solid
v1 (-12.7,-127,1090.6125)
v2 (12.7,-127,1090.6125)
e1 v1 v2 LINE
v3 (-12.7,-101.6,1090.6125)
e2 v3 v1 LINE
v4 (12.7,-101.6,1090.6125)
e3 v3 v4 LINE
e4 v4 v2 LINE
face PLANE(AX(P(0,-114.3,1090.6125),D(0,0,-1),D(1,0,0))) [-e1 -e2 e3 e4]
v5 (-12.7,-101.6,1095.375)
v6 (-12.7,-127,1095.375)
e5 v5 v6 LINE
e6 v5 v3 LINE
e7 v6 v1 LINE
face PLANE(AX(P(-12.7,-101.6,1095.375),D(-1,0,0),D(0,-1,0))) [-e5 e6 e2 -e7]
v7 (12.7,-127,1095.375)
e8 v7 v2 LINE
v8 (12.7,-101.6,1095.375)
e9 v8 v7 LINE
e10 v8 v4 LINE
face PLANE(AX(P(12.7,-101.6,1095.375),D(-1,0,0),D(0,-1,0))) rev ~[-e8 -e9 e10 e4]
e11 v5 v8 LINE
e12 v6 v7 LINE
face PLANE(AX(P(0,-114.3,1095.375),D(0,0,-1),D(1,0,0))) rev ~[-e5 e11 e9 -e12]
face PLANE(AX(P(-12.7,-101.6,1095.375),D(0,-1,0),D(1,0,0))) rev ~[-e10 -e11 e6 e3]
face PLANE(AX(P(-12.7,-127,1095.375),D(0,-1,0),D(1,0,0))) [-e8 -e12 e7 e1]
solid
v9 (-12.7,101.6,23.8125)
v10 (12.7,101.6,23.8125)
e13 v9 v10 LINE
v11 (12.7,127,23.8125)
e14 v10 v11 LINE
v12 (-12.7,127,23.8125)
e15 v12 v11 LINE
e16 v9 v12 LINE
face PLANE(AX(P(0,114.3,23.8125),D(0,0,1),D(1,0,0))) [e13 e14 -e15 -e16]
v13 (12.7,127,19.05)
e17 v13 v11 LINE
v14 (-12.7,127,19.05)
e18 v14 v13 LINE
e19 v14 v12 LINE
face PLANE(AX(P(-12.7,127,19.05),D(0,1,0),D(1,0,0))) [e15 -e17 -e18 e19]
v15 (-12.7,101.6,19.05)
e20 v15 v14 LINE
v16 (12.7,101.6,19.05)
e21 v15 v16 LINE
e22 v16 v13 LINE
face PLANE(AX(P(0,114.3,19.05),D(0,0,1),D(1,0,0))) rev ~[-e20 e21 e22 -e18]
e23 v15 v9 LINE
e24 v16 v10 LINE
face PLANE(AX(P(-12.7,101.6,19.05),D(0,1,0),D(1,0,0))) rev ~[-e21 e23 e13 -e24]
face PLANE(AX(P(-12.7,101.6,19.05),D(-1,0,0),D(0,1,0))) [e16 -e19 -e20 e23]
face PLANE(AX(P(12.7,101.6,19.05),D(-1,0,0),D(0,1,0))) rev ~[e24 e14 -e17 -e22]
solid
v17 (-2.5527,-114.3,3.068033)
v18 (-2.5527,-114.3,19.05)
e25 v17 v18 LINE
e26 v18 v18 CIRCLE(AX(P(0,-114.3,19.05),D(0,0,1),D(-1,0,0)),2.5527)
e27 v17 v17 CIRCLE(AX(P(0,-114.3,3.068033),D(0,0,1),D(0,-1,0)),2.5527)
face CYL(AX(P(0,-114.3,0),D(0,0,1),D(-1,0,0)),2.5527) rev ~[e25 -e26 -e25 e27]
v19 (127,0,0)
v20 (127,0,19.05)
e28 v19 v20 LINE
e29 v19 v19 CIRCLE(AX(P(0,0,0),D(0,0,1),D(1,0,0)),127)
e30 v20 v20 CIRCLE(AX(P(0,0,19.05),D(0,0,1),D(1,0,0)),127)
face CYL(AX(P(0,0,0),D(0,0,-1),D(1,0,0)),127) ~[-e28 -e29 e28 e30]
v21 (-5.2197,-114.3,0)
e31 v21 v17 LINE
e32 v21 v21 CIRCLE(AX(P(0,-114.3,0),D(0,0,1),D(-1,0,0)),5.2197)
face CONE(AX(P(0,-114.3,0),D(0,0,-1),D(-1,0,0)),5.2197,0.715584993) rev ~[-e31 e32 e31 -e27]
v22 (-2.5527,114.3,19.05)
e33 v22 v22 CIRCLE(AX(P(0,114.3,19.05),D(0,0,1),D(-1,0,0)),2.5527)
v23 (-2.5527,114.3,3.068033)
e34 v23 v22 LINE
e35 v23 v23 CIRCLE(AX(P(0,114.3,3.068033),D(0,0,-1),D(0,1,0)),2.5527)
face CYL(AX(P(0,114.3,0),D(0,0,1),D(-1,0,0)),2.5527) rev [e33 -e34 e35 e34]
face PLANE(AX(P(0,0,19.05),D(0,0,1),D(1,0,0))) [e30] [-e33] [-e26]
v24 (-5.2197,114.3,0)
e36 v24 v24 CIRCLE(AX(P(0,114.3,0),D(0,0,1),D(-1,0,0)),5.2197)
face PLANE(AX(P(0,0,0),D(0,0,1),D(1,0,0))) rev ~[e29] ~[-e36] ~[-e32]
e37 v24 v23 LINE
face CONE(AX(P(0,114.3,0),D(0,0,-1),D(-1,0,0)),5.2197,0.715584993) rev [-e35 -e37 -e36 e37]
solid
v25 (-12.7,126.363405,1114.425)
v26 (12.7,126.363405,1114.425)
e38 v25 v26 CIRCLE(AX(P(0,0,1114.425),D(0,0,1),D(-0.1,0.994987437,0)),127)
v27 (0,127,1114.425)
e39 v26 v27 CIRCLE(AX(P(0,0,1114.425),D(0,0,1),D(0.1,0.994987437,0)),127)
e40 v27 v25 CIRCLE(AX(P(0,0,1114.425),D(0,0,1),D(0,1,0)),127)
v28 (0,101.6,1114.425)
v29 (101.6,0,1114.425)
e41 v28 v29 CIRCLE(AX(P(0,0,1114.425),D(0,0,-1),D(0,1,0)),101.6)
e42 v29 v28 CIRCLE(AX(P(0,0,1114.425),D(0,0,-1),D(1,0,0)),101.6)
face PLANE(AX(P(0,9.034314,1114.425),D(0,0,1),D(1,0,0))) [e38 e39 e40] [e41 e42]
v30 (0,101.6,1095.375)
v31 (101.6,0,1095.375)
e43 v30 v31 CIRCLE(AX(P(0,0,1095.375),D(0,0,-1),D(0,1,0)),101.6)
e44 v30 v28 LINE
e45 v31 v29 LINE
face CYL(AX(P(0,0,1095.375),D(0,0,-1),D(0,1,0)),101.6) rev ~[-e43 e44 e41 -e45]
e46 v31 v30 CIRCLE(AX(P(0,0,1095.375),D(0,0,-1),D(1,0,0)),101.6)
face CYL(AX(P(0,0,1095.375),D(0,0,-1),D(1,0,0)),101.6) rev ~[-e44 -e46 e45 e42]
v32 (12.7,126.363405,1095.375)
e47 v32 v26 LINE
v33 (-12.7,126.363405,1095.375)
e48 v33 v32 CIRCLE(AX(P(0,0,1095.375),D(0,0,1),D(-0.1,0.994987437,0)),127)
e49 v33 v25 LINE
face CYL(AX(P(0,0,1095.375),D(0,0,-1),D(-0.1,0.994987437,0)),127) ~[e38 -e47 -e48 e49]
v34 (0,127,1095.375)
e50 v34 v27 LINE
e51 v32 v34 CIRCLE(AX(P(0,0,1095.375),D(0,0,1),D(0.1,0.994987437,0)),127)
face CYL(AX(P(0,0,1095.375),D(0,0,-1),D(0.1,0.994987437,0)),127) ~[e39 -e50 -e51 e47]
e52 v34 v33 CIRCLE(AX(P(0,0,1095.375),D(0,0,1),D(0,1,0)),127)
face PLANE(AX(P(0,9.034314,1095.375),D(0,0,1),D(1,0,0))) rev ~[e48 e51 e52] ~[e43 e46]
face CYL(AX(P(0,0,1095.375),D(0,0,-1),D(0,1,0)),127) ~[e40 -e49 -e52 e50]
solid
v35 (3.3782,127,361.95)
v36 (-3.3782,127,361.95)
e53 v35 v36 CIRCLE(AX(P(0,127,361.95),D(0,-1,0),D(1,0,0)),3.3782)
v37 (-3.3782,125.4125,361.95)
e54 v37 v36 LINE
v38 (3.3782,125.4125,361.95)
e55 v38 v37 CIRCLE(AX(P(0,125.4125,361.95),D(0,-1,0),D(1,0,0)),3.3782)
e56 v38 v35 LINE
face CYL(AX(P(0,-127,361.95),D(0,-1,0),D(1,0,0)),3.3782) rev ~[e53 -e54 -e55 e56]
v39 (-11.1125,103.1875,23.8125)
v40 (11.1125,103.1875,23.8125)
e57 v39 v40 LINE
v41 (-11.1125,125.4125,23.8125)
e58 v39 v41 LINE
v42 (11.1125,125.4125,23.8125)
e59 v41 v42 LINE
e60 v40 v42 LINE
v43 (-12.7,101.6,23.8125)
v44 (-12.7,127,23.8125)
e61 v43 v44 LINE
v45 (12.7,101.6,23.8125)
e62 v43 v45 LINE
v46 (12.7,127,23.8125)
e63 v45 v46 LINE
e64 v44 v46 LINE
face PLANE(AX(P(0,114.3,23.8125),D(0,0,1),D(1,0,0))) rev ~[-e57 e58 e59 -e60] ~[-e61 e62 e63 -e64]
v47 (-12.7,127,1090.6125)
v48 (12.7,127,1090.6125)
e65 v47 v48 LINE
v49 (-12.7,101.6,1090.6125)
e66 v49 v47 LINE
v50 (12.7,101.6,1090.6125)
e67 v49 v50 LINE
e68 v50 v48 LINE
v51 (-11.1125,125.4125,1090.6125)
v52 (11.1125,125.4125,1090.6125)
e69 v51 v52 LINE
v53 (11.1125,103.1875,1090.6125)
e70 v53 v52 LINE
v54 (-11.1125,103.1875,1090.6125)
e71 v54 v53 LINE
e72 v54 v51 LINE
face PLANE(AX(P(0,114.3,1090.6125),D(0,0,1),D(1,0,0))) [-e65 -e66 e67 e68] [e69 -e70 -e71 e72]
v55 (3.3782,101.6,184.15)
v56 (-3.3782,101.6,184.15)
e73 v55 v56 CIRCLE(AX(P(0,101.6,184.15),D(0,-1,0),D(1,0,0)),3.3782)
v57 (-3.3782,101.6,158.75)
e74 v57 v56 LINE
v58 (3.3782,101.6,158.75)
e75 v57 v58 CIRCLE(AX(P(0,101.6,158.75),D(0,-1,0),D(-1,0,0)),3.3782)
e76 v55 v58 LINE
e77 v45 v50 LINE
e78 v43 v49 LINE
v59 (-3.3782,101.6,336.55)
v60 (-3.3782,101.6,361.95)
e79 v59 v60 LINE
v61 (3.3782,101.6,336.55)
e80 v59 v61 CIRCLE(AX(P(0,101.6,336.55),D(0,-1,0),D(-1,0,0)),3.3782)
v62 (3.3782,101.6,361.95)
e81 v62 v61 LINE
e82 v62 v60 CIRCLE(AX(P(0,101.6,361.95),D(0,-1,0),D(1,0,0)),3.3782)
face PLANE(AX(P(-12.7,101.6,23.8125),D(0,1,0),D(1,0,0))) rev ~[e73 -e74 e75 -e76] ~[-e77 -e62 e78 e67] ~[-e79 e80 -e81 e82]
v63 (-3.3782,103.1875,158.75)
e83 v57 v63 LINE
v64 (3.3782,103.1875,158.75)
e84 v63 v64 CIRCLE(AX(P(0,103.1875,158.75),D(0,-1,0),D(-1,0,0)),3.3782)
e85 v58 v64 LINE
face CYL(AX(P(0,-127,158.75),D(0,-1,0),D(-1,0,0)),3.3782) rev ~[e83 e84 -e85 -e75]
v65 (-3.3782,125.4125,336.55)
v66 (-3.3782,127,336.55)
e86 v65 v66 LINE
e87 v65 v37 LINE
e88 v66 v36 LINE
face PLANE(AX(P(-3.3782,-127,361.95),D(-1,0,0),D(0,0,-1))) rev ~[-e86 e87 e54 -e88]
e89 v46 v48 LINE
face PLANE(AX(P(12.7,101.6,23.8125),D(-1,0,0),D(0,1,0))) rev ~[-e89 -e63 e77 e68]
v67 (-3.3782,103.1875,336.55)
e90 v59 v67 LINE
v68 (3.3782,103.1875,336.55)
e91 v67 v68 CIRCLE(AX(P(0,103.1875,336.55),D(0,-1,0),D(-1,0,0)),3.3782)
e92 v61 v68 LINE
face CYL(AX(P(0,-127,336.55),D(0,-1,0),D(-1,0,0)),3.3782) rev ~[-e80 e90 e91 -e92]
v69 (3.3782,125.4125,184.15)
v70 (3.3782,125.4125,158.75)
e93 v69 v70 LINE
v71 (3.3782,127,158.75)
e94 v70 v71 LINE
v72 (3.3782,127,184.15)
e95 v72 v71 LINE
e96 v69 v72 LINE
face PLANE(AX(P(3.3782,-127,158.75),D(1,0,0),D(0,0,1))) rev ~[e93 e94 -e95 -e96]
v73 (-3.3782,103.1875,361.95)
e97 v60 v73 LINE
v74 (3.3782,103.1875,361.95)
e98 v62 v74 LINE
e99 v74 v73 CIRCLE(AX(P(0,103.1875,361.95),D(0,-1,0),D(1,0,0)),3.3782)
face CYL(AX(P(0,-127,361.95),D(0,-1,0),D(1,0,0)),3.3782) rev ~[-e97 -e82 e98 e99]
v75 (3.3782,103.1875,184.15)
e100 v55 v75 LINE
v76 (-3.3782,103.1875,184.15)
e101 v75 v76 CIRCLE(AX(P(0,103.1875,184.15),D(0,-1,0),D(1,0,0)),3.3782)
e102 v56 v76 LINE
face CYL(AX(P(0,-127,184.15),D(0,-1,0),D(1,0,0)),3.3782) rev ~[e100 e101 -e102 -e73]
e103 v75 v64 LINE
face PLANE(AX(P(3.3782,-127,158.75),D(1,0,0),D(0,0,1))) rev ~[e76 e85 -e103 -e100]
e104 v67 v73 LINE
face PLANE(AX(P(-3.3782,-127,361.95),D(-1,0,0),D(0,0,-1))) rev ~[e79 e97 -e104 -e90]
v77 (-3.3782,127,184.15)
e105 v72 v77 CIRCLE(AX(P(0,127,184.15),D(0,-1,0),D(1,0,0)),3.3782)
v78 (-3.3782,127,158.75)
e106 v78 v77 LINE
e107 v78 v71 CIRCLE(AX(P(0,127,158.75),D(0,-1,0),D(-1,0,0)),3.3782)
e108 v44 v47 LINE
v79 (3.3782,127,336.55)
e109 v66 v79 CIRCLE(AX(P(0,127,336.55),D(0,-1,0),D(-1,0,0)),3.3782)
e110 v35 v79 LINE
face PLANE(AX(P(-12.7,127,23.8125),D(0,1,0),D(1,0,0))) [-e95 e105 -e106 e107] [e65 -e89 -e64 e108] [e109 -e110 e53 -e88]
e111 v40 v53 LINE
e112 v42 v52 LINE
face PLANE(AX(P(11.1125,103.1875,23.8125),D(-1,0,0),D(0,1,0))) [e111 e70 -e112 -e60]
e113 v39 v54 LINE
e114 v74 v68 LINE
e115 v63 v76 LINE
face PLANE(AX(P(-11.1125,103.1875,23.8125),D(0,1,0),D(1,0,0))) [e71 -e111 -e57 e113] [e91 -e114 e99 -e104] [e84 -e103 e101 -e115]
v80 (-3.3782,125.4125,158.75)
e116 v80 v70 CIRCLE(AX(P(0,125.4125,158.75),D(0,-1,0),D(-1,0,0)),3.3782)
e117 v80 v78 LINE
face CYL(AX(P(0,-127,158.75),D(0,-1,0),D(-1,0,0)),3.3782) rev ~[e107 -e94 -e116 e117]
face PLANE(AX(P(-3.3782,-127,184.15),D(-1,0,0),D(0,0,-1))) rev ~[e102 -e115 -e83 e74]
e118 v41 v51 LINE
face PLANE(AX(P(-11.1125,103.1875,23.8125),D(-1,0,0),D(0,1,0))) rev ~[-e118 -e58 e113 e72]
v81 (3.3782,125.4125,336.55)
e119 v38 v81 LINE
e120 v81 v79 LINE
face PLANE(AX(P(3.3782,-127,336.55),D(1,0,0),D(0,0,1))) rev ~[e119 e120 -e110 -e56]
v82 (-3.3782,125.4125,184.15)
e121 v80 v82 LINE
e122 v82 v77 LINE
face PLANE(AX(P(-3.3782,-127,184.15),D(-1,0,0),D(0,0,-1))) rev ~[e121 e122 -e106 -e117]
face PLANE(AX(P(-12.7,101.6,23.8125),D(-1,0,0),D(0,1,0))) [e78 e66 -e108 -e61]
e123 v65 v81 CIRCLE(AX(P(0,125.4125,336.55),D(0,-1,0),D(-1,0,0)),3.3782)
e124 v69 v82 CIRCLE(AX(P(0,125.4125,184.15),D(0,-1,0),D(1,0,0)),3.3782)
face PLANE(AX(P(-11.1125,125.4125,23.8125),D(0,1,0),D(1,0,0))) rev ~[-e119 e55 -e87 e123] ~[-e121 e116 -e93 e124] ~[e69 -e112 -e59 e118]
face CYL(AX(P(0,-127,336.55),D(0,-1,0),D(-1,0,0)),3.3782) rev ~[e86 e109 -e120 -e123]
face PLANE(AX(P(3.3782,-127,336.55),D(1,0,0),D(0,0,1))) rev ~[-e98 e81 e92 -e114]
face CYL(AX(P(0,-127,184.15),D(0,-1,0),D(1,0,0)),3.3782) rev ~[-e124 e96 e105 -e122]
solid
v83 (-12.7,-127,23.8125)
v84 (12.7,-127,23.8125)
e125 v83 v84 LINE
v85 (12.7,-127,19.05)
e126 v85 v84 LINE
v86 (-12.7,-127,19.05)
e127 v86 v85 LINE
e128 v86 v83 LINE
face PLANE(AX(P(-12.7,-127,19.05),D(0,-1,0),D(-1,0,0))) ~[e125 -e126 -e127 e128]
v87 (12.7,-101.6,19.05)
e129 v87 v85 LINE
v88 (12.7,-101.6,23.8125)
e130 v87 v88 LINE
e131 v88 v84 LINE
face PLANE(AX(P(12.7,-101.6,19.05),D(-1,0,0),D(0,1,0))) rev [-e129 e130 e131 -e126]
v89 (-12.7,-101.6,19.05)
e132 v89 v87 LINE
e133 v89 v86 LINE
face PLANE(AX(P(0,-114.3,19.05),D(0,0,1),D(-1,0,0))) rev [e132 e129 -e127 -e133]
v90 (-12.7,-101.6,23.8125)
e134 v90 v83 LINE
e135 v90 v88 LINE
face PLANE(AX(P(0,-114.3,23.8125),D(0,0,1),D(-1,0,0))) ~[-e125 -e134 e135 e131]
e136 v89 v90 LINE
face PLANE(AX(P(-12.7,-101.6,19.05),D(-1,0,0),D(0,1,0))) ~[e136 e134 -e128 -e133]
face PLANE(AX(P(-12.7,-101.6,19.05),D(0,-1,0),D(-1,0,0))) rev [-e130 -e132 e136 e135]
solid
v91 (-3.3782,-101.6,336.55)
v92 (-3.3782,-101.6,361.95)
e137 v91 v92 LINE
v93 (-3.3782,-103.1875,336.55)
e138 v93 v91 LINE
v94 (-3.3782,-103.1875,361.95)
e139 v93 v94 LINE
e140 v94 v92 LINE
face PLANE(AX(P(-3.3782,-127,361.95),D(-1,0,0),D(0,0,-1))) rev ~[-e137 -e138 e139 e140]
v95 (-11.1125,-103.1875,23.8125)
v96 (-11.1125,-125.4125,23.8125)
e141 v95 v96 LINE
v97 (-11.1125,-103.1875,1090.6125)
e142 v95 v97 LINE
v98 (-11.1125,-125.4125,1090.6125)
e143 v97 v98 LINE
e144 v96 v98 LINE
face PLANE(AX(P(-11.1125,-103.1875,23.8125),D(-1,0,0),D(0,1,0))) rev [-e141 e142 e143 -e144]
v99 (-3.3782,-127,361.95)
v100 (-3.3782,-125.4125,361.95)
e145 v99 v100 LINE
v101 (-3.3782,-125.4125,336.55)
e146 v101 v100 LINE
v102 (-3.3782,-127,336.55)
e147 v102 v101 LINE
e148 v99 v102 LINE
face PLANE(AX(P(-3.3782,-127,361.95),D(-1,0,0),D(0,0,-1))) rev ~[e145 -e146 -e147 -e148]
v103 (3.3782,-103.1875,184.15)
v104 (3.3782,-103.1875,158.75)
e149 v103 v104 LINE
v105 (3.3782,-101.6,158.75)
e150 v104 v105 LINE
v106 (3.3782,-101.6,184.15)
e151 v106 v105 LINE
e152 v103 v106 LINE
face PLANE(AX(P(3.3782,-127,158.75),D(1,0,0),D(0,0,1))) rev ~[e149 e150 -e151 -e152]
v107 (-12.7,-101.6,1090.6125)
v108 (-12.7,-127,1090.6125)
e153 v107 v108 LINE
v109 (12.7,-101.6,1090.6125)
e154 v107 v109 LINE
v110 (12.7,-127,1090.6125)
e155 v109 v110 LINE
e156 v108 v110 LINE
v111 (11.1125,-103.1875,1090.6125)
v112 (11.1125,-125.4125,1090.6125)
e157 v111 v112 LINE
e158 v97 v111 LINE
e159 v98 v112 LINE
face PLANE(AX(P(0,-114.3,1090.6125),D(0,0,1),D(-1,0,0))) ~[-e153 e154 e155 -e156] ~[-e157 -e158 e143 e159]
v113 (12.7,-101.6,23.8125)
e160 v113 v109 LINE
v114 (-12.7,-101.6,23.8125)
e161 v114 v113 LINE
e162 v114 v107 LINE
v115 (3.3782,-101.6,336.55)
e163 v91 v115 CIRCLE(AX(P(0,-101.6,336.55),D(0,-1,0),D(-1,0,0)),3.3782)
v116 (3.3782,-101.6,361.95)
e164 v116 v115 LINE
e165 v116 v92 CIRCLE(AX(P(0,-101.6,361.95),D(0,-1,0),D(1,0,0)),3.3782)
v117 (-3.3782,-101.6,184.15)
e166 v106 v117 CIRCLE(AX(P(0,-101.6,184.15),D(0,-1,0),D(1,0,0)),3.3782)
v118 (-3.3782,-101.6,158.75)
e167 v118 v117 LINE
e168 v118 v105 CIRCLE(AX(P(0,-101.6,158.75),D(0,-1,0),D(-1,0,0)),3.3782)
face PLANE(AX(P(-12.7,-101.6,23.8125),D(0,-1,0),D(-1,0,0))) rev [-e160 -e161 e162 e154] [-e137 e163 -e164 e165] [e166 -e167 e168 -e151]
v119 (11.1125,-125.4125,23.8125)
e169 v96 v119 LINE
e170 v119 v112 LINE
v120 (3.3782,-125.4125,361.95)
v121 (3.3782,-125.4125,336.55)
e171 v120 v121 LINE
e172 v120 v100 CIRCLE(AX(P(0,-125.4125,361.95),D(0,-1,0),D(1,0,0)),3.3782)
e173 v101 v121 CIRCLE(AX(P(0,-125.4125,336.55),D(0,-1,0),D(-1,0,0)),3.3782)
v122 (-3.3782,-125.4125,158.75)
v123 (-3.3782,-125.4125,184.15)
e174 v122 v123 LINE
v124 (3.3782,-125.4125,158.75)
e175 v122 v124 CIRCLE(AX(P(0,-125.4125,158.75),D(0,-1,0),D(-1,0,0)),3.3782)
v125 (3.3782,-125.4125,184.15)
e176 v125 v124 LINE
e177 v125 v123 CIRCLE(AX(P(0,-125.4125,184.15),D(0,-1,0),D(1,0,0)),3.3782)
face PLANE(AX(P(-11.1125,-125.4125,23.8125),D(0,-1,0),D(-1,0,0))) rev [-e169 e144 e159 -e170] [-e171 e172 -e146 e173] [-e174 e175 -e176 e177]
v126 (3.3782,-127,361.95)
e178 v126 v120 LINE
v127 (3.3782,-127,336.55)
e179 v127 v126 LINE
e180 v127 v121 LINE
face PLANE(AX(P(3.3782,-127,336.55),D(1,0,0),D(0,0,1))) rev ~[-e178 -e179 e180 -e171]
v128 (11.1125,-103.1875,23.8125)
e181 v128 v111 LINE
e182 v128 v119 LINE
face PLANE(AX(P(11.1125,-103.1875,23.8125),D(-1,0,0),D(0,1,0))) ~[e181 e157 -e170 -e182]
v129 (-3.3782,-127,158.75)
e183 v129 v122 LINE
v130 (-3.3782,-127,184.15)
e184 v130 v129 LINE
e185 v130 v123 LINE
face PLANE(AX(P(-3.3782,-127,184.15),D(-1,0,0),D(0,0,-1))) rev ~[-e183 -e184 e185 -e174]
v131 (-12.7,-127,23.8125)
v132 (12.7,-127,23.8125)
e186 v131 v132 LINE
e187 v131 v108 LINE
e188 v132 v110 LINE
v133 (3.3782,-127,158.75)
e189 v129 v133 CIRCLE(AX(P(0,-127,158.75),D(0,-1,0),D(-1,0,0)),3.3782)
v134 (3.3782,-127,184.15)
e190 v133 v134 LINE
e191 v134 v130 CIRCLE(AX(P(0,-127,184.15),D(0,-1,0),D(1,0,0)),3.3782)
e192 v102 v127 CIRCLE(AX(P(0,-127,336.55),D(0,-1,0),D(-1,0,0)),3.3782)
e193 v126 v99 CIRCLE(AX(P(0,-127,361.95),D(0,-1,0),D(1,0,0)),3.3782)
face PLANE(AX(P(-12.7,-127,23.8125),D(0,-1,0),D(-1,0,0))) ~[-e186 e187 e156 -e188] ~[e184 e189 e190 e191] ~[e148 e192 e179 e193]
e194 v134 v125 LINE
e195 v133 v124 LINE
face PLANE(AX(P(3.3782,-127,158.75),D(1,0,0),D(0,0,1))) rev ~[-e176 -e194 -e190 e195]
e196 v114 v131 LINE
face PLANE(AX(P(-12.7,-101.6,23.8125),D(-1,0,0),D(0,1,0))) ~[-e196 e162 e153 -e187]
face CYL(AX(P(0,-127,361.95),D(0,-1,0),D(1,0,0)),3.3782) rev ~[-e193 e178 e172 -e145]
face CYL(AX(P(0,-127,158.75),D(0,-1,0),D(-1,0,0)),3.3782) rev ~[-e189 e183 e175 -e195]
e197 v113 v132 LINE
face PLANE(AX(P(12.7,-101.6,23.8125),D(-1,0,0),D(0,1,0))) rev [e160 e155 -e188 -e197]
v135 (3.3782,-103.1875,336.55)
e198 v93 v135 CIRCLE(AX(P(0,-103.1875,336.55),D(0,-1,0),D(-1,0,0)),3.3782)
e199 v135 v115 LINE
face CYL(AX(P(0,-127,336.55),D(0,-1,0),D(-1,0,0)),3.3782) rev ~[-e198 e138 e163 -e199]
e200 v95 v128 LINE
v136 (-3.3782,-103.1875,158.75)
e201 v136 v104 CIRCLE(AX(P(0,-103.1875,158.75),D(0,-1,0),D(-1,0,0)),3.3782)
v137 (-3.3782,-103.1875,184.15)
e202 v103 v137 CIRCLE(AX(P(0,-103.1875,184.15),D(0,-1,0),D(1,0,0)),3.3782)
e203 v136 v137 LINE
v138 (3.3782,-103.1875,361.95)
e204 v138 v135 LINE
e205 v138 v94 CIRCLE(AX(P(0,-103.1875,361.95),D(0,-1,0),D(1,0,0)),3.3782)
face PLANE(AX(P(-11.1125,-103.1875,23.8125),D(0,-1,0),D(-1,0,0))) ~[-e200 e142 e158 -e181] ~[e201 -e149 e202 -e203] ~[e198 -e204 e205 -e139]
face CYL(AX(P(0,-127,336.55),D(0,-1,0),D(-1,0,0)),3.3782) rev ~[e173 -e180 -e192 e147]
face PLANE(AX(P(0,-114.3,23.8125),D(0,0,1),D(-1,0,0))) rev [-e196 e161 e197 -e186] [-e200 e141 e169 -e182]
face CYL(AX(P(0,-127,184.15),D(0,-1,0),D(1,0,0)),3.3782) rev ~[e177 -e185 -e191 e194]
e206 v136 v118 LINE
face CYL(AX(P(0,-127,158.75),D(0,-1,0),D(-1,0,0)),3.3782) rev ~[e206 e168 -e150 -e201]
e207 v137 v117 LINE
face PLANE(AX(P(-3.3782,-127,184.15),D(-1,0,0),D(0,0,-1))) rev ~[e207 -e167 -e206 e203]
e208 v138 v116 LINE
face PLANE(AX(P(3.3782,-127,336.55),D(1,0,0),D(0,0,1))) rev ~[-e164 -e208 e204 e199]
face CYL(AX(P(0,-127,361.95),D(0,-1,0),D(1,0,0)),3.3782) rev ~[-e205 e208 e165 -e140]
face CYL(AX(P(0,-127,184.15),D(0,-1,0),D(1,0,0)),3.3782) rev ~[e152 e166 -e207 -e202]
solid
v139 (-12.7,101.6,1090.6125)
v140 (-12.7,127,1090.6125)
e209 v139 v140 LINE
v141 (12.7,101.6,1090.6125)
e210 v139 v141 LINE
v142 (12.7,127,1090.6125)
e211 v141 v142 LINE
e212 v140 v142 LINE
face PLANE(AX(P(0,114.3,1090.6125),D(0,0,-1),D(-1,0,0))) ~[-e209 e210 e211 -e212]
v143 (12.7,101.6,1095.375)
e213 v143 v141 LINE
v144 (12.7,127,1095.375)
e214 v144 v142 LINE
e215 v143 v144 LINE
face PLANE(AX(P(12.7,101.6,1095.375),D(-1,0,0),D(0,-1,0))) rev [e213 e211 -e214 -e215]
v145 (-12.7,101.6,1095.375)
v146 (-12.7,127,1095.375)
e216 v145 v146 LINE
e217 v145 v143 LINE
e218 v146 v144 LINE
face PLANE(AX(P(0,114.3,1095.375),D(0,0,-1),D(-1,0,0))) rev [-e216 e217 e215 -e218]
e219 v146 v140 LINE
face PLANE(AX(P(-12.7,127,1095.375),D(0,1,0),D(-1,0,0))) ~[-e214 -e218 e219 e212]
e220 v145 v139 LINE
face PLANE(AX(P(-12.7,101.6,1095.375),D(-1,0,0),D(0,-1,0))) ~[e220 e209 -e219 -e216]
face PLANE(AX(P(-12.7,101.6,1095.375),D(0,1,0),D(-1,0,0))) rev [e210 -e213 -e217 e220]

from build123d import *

# Parameters (mm, degrees)
F0_R           = 127
F1_DEPTH       = 19.05
F3_D           = 5.1054
F3_CSINK_D     = 10.4394
F3_CSINK_ANGLE = 82
F5_W           = 25.4
F5_H           = 25.4
F6_DEPTH       = 4.7625
F7_W           = 25.4
F7_H           = 25.4
F7_W_2         = 22.225
F7_H_2         = 22.225
F8_DEPTH       = 1066.8
F13_DEPTH      = 19.05
F15_DEPTH      = 254.001


# Not quite as in the source:
# - a pattern or mirror of a feature is missing from the dataset's text; its kind, count and spacing are read off the source's solid


with BuildPart() as f1:
    # F0 (on Top) → F1 (new body)
    with BuildSketch(Plane.XY):
        Circle(F0_R)
    extrude(amount=F1_DEPTH)

    # F3 (through all)
    with Locations(Plane(origin=(0, 0, 0), x_dir=(1, 0, 0), z_dir=(0, 0, -1))):
        with Locations((0, 114.3)):
            f3 = CounterSinkHole(F3_D / 2, F3_CSINK_D / 2, counter_sink_angle=F3_CSINK_ANGLE)

    # F3_copies: F3 across plane
    add(f3.mirror(Plane.ZX), mode=Mode.SUBTRACT)


with BuildPart() as f6:
    # F5 (on face) → F6 (new body)
    with BuildSketch(Plane.XY.offset(19.05)):
        with Locations((0, 114.3)):
            Rectangle(F5_W, F5_H)
    extrude(amount=F6_DEPTH)


with BuildPart() as f8:
    # F7 (on face) → F8 (new body)
    with BuildSketch(Plane.XY.offset(23.8125)):
        with Locations((0, 114.3)):
            Rectangle(F7_W, F7_H)
        with Locations((0, 114.3)):
            Rectangle(F7_W_2, F7_H_2, mode=Mode.SUBTRACT)
    extrude(amount=F8_DEPTH)


with BuildPart() as f10_1:
    # F10: instance of F6
    add(f6.part.mirror(Plane(origin=(0, 114.3, 557.2125), x_dir=(1, 0, 0), z_dir=(0, 0, -1))))


with BuildPart() as f11_1:
    # F11: instance of F8
    add(f8.part.mirror(Plane.XZ))


with BuildPart() as f11_2:
    # F11: instance of F10_1
    add(f10_1.part.mirror(Plane.XZ))


with BuildPart() as f11_3:
    # F11: instance of F6
    add(f6.part.mirror(Plane.XZ))


with BuildPart() as f13:
    # F12 (on face) → F13 (new body)
    with BuildSketch(Plane.XY.offset(1095.375)):
        with BuildLine():
            ThreePointArc((-12.7, 126.3634045125), (-85.1941899427, -94.1857207861), (127, 0))
            ThreePointArc((127, 0), (94.1857207861, 85.1941899427), (12.7, 126.3634045125))
            Line((12.7, 126.3634045125), (12.7, 101.6))
            Line((12.7, 101.6), (0, 101.6))
            Line((0, 101.6), (-12.7, 101.6))
            Line((-12.7, 101.6), (-12.7, 126.3634045125))
        make_face()
        with BuildLine():
            ThreePointArc((101.6, 0), (-71.8420489686, -71.8420489686), (0, 101.6))
            ThreePointArc((0, 101.6), (71.8420489686, 71.8420489686), (101.6, 0))
        make_face(mode=Mode.SUBTRACT)
        with BuildLine():
            Line((12.7, 101.6), (12.7, 126.3634045125))
            ThreePointArc((12.7, 126.3634045125), (6.3579724326, 126.840751285), (0, 127))
            ThreePointArc((0, 127), (-6.3579724326, 126.840751285), (-12.7, 126.3634045125))
            Line((-12.7, 126.3634045125), (-12.7, 101.6))
            Line((-12.7, 101.6), (0, 101.6))
            Line((0, 101.6), (12.7, 101.6))
        make_face()
    extrude(amount=F13_DEPTH)


with BuildPart() as f15_tool:
    # F14 (on face) → F15 (new body, through all)
    with BuildSketch(Plane.XZ.offset(127)):
        with BuildLine():
            ThreePointArc((3.3782, 361.95), (0, 365.3282), (-3.3782, 361.95))
            Line((-3.3782, 361.95), (-3.3782, 336.55))
            ThreePointArc((-3.3782, 336.55), (0, 333.1718), (3.3782, 336.55))
            Line((3.3782, 336.55), (3.3782, 361.95))
        make_face()
        with BuildLine():
            ThreePointArc((3.3782, 184.15), (0, 187.5282), (-3.3782, 184.15))
            Line((-3.3782, 184.15), (-3.3782, 158.75))
            ThreePointArc((-3.3782, 158.75), (0, 155.3718), (3.3782, 158.75))
            Line((3.3782, 158.75), (3.3782, 184.15))
        make_face()
    extrude(amount=-F15_DEPTH)


with BuildPart() as f8_1:
    add(f8.part)

    # F15: cut by f15_tool
    add(f15_tool.part, mode=Mode.SUBTRACT)


with BuildPart() as f11_1_1:
    add(f11_1.part)

    # F15: cut by f15_tool
    add(f15_tool.part, mode=Mode.SUBTRACT)


solid = Compound([f1.part, f6.part, f10_1.part, f11_2.part, f11_3.part, f13.part, f8_1.part, f11_1_1.part])
